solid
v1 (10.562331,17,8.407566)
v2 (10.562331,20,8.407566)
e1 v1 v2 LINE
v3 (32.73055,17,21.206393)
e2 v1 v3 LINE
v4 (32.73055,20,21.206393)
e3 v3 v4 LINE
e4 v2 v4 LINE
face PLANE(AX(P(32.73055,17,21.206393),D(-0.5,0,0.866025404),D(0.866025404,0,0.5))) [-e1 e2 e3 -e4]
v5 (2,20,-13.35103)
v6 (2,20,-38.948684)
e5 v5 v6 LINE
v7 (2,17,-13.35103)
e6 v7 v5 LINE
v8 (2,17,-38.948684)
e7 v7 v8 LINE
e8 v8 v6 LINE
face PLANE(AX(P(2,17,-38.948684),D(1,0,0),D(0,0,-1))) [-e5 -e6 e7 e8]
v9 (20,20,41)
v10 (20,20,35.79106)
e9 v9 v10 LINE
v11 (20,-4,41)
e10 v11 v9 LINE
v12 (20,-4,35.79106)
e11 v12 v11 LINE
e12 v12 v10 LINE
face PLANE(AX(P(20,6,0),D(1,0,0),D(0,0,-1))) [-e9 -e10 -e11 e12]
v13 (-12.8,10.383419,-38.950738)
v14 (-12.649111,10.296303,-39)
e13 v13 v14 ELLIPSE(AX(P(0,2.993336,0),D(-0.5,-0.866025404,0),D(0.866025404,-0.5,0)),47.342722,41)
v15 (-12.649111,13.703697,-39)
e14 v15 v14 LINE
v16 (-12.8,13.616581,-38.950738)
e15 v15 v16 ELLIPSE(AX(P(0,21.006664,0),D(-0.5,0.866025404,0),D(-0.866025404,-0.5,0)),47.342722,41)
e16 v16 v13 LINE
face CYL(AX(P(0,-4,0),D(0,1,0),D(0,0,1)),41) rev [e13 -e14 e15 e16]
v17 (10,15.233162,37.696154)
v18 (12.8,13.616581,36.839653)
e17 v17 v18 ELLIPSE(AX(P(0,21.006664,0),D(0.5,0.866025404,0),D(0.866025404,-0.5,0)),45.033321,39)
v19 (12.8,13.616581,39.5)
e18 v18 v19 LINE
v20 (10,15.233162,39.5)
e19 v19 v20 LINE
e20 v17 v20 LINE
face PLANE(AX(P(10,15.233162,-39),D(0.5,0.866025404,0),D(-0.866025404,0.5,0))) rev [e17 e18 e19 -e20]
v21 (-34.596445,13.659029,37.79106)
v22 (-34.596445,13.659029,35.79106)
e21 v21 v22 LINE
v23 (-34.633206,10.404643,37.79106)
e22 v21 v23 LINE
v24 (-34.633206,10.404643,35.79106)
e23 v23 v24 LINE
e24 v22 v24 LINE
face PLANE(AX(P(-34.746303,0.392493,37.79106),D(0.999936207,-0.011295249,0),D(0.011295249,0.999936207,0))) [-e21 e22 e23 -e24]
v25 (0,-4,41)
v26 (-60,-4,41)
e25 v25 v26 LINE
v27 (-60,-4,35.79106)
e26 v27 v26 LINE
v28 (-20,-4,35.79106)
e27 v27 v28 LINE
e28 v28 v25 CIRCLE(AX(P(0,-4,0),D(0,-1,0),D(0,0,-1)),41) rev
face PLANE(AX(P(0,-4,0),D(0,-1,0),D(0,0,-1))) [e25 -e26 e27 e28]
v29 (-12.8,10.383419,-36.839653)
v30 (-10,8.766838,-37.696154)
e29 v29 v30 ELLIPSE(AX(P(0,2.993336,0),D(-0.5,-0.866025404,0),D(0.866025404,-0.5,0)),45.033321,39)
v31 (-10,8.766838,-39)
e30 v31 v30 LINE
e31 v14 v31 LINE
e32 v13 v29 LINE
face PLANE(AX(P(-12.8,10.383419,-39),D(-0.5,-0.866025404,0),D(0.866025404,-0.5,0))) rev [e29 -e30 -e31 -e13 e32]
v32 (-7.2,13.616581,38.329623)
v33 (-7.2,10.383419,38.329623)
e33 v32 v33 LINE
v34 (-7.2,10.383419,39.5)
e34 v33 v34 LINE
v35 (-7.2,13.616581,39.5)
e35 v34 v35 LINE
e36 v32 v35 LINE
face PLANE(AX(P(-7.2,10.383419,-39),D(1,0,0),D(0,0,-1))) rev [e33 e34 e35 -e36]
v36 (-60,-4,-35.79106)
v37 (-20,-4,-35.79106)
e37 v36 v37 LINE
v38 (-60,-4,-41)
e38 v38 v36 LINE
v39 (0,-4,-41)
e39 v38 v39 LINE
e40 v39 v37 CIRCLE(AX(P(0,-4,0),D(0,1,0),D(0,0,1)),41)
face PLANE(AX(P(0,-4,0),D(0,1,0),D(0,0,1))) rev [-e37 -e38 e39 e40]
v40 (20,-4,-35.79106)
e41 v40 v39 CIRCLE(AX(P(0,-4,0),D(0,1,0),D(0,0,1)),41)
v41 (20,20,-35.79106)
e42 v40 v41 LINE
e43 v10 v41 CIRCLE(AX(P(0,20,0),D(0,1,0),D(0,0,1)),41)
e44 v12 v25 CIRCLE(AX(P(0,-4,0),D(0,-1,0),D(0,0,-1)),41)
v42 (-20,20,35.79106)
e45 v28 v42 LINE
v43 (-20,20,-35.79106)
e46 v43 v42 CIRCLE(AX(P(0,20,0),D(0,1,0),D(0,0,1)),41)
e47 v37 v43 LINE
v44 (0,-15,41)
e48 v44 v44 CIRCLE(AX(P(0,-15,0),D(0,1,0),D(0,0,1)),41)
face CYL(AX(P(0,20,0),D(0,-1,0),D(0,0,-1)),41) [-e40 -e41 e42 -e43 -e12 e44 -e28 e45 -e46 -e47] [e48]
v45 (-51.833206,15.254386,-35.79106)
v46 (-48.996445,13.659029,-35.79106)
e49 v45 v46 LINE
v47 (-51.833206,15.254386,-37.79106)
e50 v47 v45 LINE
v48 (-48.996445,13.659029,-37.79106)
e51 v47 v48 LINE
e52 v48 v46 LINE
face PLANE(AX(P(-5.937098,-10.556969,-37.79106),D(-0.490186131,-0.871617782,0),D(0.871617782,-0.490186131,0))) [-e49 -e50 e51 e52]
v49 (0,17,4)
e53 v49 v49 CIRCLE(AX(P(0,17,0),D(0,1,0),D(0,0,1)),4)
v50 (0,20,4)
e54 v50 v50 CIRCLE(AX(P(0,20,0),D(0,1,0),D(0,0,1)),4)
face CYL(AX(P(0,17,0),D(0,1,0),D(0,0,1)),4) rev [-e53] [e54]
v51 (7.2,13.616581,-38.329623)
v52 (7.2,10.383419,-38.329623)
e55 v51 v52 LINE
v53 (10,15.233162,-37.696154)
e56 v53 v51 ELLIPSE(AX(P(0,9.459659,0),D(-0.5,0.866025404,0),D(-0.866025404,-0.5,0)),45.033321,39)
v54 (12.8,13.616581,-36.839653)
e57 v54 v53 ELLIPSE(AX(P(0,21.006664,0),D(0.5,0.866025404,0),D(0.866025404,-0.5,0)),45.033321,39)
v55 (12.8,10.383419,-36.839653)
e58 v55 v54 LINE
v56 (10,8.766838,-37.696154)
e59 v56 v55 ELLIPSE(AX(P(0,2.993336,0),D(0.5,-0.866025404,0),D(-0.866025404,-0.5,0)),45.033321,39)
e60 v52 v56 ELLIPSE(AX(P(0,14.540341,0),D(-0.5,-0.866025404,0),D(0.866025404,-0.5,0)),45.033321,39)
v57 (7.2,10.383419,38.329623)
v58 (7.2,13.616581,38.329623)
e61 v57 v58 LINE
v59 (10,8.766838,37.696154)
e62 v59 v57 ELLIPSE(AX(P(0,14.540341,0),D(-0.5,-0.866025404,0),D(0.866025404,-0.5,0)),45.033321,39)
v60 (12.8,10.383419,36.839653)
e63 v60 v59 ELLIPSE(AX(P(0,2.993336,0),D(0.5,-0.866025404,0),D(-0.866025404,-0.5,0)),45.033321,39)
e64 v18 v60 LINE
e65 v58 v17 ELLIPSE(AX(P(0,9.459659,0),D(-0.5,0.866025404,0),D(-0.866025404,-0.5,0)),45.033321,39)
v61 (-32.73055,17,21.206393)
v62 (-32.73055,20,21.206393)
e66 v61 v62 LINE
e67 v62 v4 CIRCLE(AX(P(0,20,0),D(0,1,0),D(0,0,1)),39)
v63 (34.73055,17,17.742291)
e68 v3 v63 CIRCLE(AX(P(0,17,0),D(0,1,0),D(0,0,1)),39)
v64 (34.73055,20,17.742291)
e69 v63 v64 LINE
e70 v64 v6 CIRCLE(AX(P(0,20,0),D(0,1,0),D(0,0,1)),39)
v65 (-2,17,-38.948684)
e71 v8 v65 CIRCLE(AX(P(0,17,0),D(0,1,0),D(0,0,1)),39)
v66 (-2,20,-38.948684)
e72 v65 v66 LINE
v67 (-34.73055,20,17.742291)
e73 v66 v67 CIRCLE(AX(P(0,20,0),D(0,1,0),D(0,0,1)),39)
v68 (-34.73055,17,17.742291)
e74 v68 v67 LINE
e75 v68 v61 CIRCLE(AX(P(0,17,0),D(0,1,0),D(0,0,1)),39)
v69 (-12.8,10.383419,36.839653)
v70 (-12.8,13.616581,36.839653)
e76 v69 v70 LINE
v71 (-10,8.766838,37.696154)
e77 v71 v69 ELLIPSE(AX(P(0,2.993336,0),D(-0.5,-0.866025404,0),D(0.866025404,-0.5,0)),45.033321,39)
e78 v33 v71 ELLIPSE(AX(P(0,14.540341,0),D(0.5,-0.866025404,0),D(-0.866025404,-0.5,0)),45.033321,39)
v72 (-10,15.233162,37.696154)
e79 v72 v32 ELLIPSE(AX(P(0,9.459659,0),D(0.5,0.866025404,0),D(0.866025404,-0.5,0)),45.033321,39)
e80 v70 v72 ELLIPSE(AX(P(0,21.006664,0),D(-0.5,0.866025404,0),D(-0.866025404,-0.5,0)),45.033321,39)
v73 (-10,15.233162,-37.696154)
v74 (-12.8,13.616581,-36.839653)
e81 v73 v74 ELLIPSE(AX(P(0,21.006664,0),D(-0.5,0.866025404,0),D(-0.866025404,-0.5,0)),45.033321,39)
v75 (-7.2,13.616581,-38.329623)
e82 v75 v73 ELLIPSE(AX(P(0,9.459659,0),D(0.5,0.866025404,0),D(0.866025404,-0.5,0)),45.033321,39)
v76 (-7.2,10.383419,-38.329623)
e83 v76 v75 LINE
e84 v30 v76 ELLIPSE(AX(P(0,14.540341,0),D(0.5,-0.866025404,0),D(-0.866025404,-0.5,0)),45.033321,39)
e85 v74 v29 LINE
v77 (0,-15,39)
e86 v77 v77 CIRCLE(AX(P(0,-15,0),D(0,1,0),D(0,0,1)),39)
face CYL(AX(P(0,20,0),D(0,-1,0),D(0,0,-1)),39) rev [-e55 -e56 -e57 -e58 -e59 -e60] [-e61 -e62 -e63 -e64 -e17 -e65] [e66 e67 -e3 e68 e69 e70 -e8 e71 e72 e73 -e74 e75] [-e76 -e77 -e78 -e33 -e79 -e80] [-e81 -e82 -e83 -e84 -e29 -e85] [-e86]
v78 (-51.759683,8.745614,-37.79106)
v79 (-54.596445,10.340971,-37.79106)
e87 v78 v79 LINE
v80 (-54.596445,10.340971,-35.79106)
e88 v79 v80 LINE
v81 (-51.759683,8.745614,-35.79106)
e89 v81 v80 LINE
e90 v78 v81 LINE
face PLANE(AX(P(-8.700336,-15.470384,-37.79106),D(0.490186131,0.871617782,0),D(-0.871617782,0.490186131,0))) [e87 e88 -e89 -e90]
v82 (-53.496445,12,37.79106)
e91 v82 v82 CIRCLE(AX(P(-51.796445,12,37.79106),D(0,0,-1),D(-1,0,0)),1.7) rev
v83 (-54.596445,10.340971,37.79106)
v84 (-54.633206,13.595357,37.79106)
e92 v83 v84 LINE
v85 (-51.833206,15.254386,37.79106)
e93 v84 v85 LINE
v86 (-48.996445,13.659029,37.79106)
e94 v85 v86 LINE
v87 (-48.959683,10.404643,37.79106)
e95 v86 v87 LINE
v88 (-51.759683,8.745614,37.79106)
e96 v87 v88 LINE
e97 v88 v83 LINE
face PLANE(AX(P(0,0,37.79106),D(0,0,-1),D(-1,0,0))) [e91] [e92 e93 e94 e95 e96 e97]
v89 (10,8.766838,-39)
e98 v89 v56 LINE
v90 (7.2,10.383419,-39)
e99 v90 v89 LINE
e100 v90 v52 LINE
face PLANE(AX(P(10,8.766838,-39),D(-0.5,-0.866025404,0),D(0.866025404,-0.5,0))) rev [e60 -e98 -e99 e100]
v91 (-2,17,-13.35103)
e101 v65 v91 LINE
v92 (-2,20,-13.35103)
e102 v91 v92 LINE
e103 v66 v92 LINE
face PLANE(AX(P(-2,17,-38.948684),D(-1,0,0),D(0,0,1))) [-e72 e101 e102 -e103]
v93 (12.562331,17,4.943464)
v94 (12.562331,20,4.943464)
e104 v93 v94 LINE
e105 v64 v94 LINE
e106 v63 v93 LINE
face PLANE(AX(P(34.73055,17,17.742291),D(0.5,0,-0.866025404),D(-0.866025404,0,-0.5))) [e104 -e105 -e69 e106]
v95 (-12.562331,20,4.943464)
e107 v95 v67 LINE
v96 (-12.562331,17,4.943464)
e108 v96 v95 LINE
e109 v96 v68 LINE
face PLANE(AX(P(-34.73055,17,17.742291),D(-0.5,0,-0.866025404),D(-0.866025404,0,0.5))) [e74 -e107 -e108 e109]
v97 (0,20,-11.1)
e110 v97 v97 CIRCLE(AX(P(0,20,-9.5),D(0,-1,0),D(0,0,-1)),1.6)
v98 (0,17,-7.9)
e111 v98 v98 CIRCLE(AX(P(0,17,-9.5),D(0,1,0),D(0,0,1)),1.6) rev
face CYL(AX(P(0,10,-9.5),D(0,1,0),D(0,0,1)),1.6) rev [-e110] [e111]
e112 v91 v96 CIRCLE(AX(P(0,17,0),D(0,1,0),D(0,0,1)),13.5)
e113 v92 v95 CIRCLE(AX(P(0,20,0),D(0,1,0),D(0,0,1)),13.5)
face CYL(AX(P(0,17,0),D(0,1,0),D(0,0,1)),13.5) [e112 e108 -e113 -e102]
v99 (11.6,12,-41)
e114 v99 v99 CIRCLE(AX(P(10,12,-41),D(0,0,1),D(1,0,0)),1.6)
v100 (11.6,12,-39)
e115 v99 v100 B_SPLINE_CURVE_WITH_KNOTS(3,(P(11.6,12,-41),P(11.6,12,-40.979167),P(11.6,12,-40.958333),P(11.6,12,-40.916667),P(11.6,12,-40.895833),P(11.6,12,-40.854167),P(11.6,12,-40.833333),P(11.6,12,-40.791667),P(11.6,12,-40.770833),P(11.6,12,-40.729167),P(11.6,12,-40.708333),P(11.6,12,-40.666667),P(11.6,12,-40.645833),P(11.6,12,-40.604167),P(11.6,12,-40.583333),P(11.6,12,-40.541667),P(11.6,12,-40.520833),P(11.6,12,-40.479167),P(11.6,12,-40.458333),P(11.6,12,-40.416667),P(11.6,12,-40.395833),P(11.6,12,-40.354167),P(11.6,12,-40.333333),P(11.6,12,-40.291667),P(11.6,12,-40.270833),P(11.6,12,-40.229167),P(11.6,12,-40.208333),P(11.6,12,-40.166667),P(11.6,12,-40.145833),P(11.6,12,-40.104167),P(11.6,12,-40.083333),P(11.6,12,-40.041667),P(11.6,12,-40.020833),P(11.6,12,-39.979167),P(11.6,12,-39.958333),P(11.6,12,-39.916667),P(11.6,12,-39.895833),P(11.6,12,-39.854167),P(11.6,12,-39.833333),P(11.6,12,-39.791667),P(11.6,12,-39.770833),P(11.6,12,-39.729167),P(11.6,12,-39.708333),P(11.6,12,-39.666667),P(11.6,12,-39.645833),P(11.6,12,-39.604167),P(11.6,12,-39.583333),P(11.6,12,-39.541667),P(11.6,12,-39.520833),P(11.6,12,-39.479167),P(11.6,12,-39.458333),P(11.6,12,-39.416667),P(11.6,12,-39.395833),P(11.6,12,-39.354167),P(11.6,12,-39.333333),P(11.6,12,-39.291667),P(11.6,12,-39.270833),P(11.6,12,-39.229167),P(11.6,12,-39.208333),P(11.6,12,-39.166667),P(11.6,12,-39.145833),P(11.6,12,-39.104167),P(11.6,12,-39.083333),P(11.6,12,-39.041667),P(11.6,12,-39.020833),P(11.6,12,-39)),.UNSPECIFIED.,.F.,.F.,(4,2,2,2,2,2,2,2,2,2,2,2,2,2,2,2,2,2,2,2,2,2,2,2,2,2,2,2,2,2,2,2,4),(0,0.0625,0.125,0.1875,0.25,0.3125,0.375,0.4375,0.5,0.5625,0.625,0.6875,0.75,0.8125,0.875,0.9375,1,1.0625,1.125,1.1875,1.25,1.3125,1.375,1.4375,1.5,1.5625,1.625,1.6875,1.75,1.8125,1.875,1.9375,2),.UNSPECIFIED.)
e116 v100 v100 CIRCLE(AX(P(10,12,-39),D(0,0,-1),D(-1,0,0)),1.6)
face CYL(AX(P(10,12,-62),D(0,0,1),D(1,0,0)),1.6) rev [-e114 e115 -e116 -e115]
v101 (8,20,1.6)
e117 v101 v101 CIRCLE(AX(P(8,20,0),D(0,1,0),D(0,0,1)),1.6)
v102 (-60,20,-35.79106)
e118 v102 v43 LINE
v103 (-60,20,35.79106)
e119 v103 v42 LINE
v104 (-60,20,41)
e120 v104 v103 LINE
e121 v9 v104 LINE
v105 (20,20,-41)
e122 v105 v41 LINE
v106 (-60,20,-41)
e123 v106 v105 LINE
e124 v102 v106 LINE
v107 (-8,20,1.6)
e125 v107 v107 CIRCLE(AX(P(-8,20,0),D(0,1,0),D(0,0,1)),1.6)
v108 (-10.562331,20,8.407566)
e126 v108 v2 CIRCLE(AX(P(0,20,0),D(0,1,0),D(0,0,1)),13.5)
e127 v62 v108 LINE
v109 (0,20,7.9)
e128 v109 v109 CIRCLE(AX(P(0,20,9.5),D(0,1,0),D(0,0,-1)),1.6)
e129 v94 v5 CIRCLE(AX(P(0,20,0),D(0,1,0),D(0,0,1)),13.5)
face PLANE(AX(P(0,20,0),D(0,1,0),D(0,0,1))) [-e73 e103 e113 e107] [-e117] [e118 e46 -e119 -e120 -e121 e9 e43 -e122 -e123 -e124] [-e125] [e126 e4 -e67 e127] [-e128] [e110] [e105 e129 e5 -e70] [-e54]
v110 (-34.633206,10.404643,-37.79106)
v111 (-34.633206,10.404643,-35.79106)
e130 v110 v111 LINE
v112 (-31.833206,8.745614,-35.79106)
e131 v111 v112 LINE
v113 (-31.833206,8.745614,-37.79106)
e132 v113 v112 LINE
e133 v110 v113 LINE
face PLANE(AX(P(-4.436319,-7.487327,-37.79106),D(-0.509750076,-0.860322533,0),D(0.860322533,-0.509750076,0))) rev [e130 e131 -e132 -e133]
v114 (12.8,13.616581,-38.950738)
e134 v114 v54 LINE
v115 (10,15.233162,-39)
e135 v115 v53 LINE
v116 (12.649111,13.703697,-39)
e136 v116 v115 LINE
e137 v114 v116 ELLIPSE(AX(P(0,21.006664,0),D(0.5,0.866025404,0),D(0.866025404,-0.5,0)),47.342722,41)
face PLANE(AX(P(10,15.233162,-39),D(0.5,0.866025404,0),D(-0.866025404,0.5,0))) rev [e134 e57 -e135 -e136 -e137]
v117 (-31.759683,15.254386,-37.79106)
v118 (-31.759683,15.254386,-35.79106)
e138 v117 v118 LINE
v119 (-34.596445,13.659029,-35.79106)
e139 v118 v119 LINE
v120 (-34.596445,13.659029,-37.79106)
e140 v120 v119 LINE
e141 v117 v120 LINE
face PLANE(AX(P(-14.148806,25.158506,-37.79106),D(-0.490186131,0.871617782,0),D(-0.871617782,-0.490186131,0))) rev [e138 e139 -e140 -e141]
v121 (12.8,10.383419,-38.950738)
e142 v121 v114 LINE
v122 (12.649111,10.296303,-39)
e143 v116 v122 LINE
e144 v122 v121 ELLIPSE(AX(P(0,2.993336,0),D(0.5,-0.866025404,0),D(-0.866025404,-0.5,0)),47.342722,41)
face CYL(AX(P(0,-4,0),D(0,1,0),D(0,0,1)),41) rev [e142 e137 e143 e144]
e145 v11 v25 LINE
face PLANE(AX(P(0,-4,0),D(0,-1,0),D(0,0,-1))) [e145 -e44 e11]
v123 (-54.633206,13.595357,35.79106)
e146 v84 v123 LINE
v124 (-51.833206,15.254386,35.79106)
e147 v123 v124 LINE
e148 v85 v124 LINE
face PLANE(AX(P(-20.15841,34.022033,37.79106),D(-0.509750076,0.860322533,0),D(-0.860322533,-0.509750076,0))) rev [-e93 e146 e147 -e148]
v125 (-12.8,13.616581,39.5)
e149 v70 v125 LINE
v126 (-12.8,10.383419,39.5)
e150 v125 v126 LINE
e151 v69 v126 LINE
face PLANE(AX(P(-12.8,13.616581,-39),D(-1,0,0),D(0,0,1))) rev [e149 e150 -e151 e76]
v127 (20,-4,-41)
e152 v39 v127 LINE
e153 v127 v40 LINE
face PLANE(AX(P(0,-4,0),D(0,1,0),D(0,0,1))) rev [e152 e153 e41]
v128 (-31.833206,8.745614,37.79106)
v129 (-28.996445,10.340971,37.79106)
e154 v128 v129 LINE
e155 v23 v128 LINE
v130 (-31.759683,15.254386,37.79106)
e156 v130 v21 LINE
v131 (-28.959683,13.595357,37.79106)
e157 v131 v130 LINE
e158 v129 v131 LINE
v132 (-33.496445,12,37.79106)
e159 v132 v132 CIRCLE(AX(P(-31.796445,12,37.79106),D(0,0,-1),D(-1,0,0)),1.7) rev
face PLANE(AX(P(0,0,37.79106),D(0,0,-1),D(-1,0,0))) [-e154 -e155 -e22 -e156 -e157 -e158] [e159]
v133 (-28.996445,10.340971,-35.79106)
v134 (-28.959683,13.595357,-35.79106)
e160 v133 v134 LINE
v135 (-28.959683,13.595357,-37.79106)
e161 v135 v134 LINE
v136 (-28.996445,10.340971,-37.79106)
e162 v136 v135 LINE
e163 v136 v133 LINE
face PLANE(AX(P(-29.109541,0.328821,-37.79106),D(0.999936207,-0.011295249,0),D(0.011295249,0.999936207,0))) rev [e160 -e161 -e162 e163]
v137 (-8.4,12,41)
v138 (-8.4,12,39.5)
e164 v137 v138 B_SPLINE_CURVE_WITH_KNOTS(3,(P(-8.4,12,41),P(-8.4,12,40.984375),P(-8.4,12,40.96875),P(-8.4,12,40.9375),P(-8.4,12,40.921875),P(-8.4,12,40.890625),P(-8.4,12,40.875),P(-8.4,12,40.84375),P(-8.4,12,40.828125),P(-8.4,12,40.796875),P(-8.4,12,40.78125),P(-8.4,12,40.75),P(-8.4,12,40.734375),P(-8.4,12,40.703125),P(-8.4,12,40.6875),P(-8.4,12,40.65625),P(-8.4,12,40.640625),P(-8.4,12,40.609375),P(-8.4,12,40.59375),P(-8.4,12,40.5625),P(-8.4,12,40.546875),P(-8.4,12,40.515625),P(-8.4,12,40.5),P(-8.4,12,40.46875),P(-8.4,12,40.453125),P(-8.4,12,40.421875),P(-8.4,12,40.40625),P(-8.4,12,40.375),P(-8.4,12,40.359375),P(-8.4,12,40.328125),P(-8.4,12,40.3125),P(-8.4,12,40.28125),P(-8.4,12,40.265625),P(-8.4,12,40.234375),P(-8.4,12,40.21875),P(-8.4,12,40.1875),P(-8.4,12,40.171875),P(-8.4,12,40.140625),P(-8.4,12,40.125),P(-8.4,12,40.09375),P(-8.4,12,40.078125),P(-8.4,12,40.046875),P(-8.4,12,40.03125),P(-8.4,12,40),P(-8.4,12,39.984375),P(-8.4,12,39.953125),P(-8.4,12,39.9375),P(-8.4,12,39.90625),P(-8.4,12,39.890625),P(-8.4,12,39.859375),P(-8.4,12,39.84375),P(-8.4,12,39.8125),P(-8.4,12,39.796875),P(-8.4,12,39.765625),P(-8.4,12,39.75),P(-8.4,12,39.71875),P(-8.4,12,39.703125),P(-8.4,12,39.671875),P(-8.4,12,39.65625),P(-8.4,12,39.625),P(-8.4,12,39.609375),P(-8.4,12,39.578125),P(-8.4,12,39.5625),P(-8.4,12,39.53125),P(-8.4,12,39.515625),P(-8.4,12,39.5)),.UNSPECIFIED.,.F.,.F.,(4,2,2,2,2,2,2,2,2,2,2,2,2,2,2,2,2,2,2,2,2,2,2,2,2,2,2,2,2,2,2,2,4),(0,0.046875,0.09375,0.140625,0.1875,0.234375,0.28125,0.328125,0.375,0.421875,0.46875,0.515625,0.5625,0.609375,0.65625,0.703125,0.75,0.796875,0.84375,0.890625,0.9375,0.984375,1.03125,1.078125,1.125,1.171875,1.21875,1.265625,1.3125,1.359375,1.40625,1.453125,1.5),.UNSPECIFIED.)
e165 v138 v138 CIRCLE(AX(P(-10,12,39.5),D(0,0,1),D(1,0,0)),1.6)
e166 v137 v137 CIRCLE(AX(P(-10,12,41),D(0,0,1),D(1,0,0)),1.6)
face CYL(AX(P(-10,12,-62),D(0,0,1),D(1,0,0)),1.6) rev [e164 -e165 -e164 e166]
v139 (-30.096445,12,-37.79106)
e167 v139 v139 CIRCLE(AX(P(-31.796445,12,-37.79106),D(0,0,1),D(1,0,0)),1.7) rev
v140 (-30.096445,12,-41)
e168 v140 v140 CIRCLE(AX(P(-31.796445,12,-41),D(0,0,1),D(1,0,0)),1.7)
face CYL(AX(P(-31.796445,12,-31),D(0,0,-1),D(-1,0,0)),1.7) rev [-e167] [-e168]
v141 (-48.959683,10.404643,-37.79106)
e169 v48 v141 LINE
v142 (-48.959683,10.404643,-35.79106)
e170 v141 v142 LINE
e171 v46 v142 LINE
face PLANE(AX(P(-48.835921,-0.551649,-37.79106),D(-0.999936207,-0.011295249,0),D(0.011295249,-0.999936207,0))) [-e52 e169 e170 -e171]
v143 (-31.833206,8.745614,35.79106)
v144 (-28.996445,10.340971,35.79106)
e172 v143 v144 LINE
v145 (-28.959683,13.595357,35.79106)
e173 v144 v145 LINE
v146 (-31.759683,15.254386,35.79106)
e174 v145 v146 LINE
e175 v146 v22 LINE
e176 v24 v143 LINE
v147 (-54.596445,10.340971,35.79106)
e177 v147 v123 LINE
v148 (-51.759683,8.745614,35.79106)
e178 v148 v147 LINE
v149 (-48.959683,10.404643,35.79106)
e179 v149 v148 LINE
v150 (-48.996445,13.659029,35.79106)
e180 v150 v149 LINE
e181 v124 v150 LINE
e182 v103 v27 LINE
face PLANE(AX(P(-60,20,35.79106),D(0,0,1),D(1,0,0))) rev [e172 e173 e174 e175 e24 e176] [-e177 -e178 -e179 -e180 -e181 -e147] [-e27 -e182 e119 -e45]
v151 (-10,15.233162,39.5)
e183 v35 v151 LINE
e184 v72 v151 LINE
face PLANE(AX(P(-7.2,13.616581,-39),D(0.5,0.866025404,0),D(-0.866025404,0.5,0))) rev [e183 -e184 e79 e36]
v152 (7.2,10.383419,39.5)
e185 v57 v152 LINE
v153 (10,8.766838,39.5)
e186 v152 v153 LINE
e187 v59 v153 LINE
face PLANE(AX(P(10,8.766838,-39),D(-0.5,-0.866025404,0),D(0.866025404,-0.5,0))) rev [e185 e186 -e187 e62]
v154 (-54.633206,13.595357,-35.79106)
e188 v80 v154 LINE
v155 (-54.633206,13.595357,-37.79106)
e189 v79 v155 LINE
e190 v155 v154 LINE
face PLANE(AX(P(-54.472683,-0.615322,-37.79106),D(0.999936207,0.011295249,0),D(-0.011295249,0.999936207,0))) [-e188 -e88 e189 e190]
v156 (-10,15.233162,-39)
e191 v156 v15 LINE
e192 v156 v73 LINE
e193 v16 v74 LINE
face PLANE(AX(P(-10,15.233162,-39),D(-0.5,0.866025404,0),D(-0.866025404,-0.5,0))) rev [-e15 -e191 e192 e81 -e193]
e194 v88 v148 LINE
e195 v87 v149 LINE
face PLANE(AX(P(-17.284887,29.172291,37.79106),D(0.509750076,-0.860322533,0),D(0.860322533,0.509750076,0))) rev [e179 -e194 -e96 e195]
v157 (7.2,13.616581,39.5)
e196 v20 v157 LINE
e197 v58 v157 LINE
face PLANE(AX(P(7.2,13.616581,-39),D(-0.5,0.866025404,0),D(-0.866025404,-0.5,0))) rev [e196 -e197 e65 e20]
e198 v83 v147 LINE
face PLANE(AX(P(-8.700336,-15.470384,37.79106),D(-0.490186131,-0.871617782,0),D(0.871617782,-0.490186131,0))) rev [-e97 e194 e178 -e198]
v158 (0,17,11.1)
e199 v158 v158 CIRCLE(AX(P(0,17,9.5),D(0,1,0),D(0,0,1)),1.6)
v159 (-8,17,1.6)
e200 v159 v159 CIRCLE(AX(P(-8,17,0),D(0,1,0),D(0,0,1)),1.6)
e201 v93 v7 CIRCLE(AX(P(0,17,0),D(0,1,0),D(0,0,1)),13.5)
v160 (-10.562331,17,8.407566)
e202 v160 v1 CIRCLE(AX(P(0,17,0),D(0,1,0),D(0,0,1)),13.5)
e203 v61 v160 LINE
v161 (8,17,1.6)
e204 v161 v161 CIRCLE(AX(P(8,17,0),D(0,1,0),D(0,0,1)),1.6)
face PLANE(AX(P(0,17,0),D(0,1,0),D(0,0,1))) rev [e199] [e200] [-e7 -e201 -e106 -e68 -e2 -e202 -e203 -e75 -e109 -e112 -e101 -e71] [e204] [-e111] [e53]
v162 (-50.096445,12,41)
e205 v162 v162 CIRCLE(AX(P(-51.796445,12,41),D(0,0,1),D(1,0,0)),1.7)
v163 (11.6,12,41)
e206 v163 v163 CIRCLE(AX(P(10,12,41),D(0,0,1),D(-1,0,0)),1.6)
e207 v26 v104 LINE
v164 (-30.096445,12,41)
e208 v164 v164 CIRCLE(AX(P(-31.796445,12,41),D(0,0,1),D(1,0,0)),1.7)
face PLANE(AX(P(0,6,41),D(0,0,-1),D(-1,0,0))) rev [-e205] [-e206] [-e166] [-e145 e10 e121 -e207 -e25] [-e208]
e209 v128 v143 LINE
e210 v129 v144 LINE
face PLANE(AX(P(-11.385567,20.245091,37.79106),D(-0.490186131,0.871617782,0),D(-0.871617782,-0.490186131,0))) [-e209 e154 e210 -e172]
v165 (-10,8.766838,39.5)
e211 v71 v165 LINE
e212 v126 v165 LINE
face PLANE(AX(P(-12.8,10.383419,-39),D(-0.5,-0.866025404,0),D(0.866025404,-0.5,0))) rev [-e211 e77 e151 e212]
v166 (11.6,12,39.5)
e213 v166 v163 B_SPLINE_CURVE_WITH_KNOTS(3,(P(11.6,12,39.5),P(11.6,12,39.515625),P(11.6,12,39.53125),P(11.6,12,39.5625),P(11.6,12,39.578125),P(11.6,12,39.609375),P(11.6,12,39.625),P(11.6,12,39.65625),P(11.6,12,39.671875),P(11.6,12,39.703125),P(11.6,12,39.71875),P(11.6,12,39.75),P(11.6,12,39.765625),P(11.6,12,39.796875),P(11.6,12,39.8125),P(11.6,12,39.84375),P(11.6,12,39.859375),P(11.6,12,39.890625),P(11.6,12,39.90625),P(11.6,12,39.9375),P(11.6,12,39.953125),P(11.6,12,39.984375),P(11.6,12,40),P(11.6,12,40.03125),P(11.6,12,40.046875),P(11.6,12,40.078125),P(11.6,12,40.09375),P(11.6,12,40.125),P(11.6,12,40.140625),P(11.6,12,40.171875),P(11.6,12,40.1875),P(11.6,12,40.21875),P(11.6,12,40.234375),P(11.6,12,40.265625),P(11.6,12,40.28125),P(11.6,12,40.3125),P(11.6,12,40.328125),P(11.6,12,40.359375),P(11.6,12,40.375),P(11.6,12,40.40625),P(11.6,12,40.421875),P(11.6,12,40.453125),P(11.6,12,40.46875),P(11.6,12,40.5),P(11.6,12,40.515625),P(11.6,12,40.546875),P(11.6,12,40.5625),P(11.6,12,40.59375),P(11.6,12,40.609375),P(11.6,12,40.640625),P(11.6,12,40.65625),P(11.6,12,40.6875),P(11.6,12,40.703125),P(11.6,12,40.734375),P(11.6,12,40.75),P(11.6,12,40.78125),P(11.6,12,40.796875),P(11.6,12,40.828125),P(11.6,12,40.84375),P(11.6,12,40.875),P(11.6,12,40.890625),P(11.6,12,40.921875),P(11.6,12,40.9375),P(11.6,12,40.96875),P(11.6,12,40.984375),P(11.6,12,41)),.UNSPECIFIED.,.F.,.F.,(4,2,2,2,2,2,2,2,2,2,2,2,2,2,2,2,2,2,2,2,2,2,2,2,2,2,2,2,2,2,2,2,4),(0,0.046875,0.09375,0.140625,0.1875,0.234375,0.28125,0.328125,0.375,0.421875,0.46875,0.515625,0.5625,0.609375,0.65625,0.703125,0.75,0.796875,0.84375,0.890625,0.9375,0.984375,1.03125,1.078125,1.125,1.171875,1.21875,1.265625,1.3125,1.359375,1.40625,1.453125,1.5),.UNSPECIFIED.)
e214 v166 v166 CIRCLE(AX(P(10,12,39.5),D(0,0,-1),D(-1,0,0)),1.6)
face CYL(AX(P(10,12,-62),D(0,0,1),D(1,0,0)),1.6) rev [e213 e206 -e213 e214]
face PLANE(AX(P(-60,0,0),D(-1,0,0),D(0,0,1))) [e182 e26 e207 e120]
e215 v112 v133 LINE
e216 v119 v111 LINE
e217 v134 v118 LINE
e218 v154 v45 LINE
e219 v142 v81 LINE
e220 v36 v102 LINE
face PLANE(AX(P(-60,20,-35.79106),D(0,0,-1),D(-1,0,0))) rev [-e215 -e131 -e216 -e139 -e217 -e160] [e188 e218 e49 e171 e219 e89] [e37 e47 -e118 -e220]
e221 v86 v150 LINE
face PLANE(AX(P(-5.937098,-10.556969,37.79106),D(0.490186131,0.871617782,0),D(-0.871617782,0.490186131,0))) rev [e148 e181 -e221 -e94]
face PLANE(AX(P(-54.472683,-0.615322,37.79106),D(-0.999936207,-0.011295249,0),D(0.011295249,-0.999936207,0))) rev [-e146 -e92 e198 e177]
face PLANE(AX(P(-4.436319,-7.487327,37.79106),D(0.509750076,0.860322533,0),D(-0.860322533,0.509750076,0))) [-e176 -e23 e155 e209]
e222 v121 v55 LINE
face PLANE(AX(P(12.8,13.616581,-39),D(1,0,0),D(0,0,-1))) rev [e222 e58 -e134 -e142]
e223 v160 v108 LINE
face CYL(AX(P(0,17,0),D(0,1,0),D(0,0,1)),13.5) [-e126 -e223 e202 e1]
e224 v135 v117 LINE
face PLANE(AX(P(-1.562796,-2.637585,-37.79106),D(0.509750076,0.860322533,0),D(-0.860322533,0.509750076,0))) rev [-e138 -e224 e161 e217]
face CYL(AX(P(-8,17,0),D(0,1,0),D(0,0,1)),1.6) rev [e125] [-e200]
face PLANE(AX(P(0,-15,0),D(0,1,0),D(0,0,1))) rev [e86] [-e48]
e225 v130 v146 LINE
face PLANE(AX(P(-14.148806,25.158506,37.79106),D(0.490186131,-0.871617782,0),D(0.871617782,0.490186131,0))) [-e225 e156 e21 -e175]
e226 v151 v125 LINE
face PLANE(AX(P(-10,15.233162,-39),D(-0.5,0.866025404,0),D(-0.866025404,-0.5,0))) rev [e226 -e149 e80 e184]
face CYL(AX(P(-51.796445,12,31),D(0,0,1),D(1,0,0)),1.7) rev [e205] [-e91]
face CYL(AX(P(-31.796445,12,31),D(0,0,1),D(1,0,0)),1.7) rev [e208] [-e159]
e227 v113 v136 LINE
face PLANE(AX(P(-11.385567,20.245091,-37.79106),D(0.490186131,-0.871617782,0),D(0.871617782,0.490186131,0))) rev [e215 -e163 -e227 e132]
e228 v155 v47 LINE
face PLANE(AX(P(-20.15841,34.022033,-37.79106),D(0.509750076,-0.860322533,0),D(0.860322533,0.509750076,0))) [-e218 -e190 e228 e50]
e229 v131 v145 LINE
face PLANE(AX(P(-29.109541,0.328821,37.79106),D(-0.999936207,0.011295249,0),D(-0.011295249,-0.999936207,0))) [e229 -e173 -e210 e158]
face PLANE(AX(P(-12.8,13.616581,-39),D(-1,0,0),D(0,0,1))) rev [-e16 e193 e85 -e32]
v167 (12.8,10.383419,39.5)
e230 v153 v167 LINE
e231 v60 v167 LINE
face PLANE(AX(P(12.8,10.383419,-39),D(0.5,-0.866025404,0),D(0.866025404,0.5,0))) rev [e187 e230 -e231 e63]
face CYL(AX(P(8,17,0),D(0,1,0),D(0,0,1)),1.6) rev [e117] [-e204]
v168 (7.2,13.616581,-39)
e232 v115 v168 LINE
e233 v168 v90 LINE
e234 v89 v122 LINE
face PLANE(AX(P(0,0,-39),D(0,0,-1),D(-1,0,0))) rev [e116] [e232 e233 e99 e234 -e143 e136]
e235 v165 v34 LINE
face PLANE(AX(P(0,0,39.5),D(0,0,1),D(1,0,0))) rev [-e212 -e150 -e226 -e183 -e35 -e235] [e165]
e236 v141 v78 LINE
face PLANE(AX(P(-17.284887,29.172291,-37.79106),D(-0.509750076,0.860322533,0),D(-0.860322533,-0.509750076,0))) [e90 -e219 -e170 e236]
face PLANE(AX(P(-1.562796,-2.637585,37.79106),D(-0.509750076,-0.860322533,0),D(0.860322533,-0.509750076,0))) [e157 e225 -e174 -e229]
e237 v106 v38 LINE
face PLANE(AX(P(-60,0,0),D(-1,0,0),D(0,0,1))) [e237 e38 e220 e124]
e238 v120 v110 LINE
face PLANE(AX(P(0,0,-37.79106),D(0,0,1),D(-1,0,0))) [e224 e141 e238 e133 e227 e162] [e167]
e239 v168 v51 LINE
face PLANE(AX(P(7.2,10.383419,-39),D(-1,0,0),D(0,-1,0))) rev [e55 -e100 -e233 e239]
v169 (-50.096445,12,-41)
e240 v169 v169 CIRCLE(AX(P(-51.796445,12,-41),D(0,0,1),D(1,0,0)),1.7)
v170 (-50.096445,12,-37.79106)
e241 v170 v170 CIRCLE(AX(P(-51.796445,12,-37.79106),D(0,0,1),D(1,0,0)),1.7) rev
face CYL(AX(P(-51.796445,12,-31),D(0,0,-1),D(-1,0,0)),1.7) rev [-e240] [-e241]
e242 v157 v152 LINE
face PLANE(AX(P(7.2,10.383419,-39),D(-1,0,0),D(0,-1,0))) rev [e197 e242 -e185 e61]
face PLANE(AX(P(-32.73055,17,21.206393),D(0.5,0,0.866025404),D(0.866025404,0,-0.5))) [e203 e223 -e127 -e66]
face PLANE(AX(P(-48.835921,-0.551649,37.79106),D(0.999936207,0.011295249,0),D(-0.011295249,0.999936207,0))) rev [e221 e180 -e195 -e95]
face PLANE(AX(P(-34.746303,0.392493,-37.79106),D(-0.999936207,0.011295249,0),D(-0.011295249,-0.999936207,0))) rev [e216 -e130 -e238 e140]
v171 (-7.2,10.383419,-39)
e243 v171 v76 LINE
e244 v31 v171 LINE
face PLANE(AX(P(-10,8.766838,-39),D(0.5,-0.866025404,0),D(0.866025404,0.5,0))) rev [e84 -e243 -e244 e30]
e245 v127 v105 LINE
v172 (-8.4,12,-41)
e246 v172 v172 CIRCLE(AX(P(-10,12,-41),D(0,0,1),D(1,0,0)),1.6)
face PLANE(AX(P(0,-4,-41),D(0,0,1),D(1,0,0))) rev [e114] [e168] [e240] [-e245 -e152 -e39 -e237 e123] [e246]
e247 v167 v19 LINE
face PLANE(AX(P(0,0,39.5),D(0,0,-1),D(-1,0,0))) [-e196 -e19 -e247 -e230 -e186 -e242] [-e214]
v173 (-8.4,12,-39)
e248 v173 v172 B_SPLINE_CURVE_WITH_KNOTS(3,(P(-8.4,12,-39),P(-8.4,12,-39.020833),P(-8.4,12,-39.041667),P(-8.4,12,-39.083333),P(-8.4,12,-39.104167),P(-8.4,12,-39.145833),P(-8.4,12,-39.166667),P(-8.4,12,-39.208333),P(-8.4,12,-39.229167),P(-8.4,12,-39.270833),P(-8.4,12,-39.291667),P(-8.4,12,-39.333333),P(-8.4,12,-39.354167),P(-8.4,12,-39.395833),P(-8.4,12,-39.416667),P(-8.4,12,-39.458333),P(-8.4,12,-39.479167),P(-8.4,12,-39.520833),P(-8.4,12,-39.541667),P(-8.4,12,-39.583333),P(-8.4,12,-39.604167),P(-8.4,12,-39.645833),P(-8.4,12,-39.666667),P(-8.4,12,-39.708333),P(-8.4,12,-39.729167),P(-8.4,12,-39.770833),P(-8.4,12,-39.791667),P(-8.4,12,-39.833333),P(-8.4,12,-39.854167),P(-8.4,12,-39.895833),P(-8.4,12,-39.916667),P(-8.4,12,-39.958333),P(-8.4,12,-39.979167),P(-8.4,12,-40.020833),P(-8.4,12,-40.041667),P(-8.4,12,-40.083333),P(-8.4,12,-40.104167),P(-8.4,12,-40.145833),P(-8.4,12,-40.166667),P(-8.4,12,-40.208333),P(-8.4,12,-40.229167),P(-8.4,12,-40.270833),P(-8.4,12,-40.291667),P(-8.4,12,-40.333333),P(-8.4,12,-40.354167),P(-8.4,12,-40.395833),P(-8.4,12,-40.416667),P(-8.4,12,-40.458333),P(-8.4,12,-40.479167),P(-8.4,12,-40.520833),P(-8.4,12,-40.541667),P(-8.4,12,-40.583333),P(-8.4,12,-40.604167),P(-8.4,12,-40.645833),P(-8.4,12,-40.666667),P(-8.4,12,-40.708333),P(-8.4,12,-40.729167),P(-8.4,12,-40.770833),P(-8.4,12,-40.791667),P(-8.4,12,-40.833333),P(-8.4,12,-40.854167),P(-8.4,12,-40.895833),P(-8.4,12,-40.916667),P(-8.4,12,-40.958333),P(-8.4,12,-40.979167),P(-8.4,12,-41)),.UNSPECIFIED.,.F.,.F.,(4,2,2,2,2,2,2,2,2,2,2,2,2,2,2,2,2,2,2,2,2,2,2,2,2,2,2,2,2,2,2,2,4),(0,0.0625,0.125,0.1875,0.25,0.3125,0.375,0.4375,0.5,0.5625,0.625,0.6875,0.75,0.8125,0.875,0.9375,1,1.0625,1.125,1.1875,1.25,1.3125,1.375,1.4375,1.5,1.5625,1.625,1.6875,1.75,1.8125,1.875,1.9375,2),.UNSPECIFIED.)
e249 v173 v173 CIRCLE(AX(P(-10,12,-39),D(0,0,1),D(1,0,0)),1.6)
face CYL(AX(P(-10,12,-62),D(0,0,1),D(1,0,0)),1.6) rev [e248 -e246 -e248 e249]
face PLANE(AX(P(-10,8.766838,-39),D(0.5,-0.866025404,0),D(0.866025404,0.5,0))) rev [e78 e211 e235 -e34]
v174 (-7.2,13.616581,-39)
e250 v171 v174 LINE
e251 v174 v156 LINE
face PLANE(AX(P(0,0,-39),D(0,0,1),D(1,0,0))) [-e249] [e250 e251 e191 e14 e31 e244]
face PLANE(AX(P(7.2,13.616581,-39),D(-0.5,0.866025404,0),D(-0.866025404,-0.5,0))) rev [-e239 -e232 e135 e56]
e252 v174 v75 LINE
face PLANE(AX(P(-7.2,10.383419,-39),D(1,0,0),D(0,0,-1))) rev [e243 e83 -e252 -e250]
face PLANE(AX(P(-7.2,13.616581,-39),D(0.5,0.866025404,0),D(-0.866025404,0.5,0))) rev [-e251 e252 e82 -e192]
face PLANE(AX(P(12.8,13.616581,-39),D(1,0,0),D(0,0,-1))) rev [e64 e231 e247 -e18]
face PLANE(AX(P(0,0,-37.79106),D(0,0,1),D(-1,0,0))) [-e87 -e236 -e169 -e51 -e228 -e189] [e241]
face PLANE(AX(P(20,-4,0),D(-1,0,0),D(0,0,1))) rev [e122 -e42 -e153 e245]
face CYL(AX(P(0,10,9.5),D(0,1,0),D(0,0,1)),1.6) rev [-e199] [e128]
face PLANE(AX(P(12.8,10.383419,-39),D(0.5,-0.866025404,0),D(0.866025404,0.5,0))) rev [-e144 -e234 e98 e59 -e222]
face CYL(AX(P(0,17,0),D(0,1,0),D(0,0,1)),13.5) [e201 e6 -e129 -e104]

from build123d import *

# Parameters (mm, degrees)
SKETCH_1_R           = 41
SKETCH_1_R_2         = 39
EXTRUDE_1_DEPTH      = 20
EXTRUDE_START        = -14
EXTRUDE_2_DEPTH      = 14
EXTRUDE_START_2      = -3
SKETCH_3_R           = 4
SKETCH_3_R_2         = 1.6
EXTRUDE_3_DEPTH      = 3
CUT_EXTRUDE_3_DEPTH  = 3
EXTRUDE_5_DEPTH      = 10
EXTRUDE_5_DEPTH_BACK = 15
SKETCH_1_2_R         = 41
SKETCH_1_2_R_2       = 39
EXTRUDE_START_3      = 10
EXTRUDE_7_DEPTH      = 10
EXTRUDE_8_DEPTH      = 10
EXTRUDE_8_DEPTH_BACK = 5
CUT_EXTRUDE_4_DEPTH  = 80
EXTRUDE_START_4      = -24
EXTRUDE_10_DEPTH     = 24
EXTRUDE_9_DEPTH      = 10
EXTRUDE_9_DEPTH_BACK = 1.5
CUT_EXTRUDE_6_DEPTH  = 10
SKETCH_16_R          = 1.6
CUT_EXTRUDE_7_DEPTH  = 103
SKETCH_18_R          = 1.6
CUT_EXTRUDE_8_DEPTH  = 10
SKETCH_18_4_R        = 1.6
CUT_EXTRUDE_9_DEPTH  = 10
SKETCH_21_W          = 5.208939664
SKETCH_21_H          = 24
EXTRUDE_11_DEPTH     = 40
SKETCH_22_W          = 5.208939664
SKETCH_22_H          = 24
EXTRUDE_12_DEPTH     = 40
SKETCH_23_R          = 1.7
CUT_EXTRUDE_10_DEPTH = 10
CUT_EXTRUDE_START    = -2
SKETCH_24_R          = 1.7
CUT_EXTRUDE_11_DEPTH = 2


# Read off the part's stored shape, not the designer's step: the extrude step
with BuildPart() as part:
    # 草图1 → 凸台-拉伸1 (new body)
    with BuildSketch(Plane(origin=(0, 0, 0), x_dir=(1, 0, 0), z_dir=(0, 1, 0))):
        with Locations(Location((0, 0, 0), (0, 0, 270))):
            Circle(SKETCH_1_R)
        with Locations(Location((0, 0, 0), (0, 0, 270))):
            Circle(SKETCH_1_R_2, mode=Mode.SUBTRACT)
    extrude(amount=EXTRUDE_1_DEPTH)

    # 草图2 → 凸台-拉伸2 (add)
    with BuildSketch(Plane(origin=(0, 20, 0), x_dir=(1, 0, 0), z_dir=(0, 1, 0)).offset(EXTRUDE_START)):
        with BuildLine():
            Line((-20, -41), (3.5e-08, -41))
            ThreePointArc((3.5e-08, -41), (-10.333598732, -39.676400256), (-20, -35.791060336))
            Line((-20, -35.791060336), (-20, -41))
        make_face()
        with BuildLine():
            Line((3.5e-08, -41), (20, -41))
            Line((20, -41), (20, -35.791060336))
            ThreePointArc((20, -35.791060336), (10.333598766, -39.676400247), (3.5e-08, -41))
        make_face()
    extrude(amount=EXTRUDE_2_DEPTH)

    # 草图3 → 凸台-拉伸3 (add)
    with BuildSketch(Plane(origin=(0, 20, 0), x_dir=(1, 0, 0), z_dir=(0, 1, 0)).offset(EXTRUDE_START_2)):
        with BuildLine():
            Line((-2, 38.948684188), (-2, 13.351029923))
            ThreePointArc((-2, 13.351029923), (-11.691342951, 6.75), (-12.56233108, -4.943464154))
            Line((-12.56233108, -4.943464154), (-34.730549951, -17.742291287))
            ThreePointArc((-34.730549951, -17.742291287), (-33.774990748, -19.5), (-32.730549951, -21.206392902))
            Line((-32.730549951, -21.206392902), (-10.56233108, -8.407565769))
            ThreePointArc((-10.56233108, -8.407565769), (0, -13.5), (10.56233108, -8.407565769))
            Line((10.56233108, -8.407565769), (32.730549951, -21.206392902))
            ThreePointArc((32.730549951, -21.206392902), (33.774990748, -19.5), (34.730549951, -17.742291287))
            Line((34.730549951, -17.742291287), (12.56233108, -4.943464154))
            ThreePointArc((12.56233108, -4.943464154), (11.691342951, 6.75), (2, 13.351029923))
            Line((2, 13.351029923), (2, 38.948684188))
            ThreePointArc((2, 38.948684188), (0, 39), (-2, 38.948684188))
        make_face()
        with Locations(Location((0, 0, 0), (0, 0, 270))):
            Circle(SKETCH_3_R, mode=Mode.SUBTRACT)
        with Locations(Location((-8, 0, 0), (0, 0, 270))):
            Circle(SKETCH_3_R_2, mode=Mode.SUBTRACT)
        with Locations(Location((8, 0, 0), (0, 0, 270))):
            Circle(SKETCH_3_R_2, mode=Mode.SUBTRACT)
    extrude(amount=EXTRUDE_3_DEPTH)

    # 草图7 → 切除-拉伸3 (cut)
    with BuildSketch(Plane.XZ.offset(-6)):
        with BuildLine():
            Line((0, 41), (-20, 41))
            Line((-20, 41), (-20, 35.791060336))
            ThreePointArc((-20, 35.791060336), (-10.333598749, 39.676400251), (0, 41))
        make_face()
        with BuildLine():
            Line((20, 41), (0, 41))
            ThreePointArc((0, 41), (10.333598749, 39.676400251), (20, 35.791060336))
            Line((20, 35.791060336), (20, 41))
        make_face()
    extrude(amount=-CUT_EXTRUDE_3_DEPTH, mode=Mode.SUBTRACT)

    # 草图1<2> → 凸台-拉伸5 (add, two sides: drawn at the far end of the back side and taken through both)
    with BuildSketch(Plane(origin=(0, 0, 0), x_dir=(1, 0, 0), z_dir=(0, 1, 0)).offset(-EXTRUDE_5_DEPTH_BACK)):
        with Locations(Location((0, 0, 0), (0, 0, 270))):
            Circle(SKETCH_1_2_R)
        with Locations(Location((0, 0, 0), (0, 0, 92.939534486))):
            Circle(SKETCH_1_2_R_2, mode=Mode.SUBTRACT)
    extrude(amount=EXTRUDE_5_DEPTH + EXTRUDE_5_DEPTH_BACK)

    # 草图7<4> → 凸台-拉伸7 (add)
    with BuildSketch(Plane.XZ.offset(-6).offset(EXTRUDE_START_3)):
        with BuildLine():
            Line((0, 41), (-20, 41))
            Line((-20, 41), (-20, 35.791060336))
            ThreePointArc((-20, 35.791060336), (-10.333598749, 39.676400251), (0, 41))
        make_face()
        with BuildLine():
            Line((20, 41), (0, 41))
            ThreePointArc((0, 41), (10.333598749, 39.676400251), (20, 35.791060336))
            Line((20, 35.791060336), (20, 41))
        make_face()
    extrude(amount=-EXTRUDE_7_DEPTH)

    # 草图7<5> → 凸台-拉伸8 (add, two sides: drawn at the far end of the back side and taken through both)
    with BuildSketch(Plane.XZ.offset(-6).offset(-EXTRUDE_8_DEPTH_BACK)):
        with BuildLine():
            Line((0, 41), (-20, 41))
            Line((-20, 41), (-20, 35.791060336))
            ThreePointArc((-20, 35.791060336), (-10.333598749, 39.676400251), (0, 41))
        make_face()
        with BuildLine():
            Line((20, 41), (0, 41))
            ThreePointArc((0, 41), (10.333598749, 39.676400251), (20, 35.791060336))
            Line((20, 35.791060336), (20, 41))
        make_face()
    extrude(amount=EXTRUDE_8_DEPTH + EXTRUDE_8_DEPTH_BACK)

    # 草图4 → 切除-拉伸4 (cut)
    with BuildSketch(Plane.XY.offset(41)):
        Polygon((-10, 8.766838493), (-7.2, 10.383419246), (-7.2, 13.616580754), (-10, 15.233161507), (-12.8, 13.616580754), (-12.8, 10.383419246), align=None)
        Polygon((12.8, 10.383419246), (10, 8.766838493), (7.2, 10.383419246), (7.2, 13.616580754), (10, 15.233161507), (12.8, 13.616580754), align=None)
    extrude(amount=-CUT_EXTRUDE_4_DEPTH, mode=Mode.SUBTRACT)

    # 凸台-拉伸10 outline → 凸台-拉伸10 (add)
    with BuildSketch(Plane(origin=(0, 20, 0), x_dir=(1, 0, 0), z_dir=(0, 1, 0)).offset(EXTRUDE_START_4)):
        with BuildLine():
            Line((20, 35.791060336), (20, 41))
            Line((20, 41), (8e-08, 41))
            ThreePointArc((8e-08, 41), (6.403124277, 40.496913456), (12.649110641, 39))
            ThreePointArc((12.649110641, 39), (12.72457916, 38.975442079), (12.8, 38.950738119))
            ThreePointArc((12.8, 38.950738119), (16.475918515, 37.543895763), (20, 35.791060336))
        make_face()
        with BuildLine():
            ThreePointArc((-12.649110641, 39), (-6.403124198, 40.496913469), (8e-08, 41))
            Line((8e-08, 41), (-20, 41))
            Line((-20, 41), (-20, 35.791060336))
            ThreePointArc((-20, 35.791060336), (-16.475918515, 37.543895763), (-12.8, 38.950738119))
            ThreePointArc((-12.8, 38.950738119), (-12.72457916, 38.975442079), (-12.649110641, 39))
        make_face()
    extrude(amount=EXTRUDE_10_DEPTH)

    # 草图4<3> → 凸台-拉伸9 (add, two sides: drawn at the far end of the back side and taken through both)
    with BuildSketch(Plane.XY.offset(41).offset(-EXTRUDE_9_DEPTH_BACK)):
        Polygon((-10, 8.766838493), (-7.2, 10.383419246), (-7.2, 13.616580754), (-10, 15.233161507), (-12.8, 13.616580754), (-12.8, 10.383419246), align=None)
        Polygon((12.8, 10.383419246), (10, 8.766838493), (7.2, 10.383419246), (7.2, 13.616580754), (10, 15.233161507), (12.8, 13.616580754), align=None)
    extrude(amount=EXTRUDE_9_DEPTH + EXTRUDE_9_DEPTH_BACK)

    # 草图13 → 切除-拉伸6 (cut)
    with BuildSketch(Plane.XY.offset(51)):
        Polygon((10, 15.233161507), (7.2, 13.616580754), (7.2, 10.383419246), (10, 8.766838493), (12.8, 10.383419246), (12.8, 13.616580754), align=None)
        Polygon((-10, 15.233161507), (-12.8, 13.616580754), (-12.8, 10.383419246), (-10, 8.766838493), (-7.2, 10.383419246), (-7.2, 13.616580754), align=None)
    extrude(amount=-CUT_EXTRUDE_6_DEPTH, mode=Mode.SUBTRACT)

    # 草图16 → 切除-拉伸7 (cut)
    with BuildSketch(Plane.XY.offset(41)):
        with Locations((-10, 12)):
            Circle(SKETCH_16_R)
        with Locations((10, 12)):
            Circle(SKETCH_16_R)
    extrude(amount=-CUT_EXTRUDE_7_DEPTH, mode=Mode.SUBTRACT)

    # 草图18 → 切除-拉伸8 (cut)
    with BuildSketch(Plane(origin=(0, 20, 0), x_dir=(1, 0, 0), z_dir=(0, 1, 0))):
        with Locations(Location((0, 9.5, 0), (0, 0, 270))):
            Circle(SKETCH_18_R)
    extrude(amount=-CUT_EXTRUDE_8_DEPTH, mode=Mode.SUBTRACT)

    # 草图18<4> → 切除-拉伸9 (cut)
    with BuildSketch(Plane(origin=(0, 20, 0), x_dir=(1, 0, 0), z_dir=(0, 1, 0))):
        with Locations(Location((0, 9.5, 0), (0, 0, 270))):
            Circle(SKETCH_18_4_R)
        with Locations(Location((0, -9.5, 0), (0, 0, 270))):
            Circle(SKETCH_18_4_R)
    extrude(amount=-CUT_EXTRUDE_9_DEPTH, mode=Mode.SUBTRACT)

    # 草图21 → 凸台-拉伸11 (add)
    with BuildSketch(Plane.ZY.offset(20)):
        with Locations((38.395530168, 8)):
            Rectangle(SKETCH_21_W, SKETCH_21_H)
    extrude(amount=EXTRUDE_11_DEPTH)

    # 草图22 → 凸台-拉伸12 (add)
    with BuildSketch(Plane.ZY.offset(20)):
        with Locations((-38.395530168, 8)):
            Rectangle(SKETCH_22_W, SKETCH_22_H)
    extrude(amount=EXTRUDE_12_DEPTH)

    # 草图23 → 切除-拉伸10 (cut)
    with BuildSketch(Plane.XY.offset(41)):
        with Locations((-51.796444508, 12)):
            Circle(SKETCH_23_R)
        with Locations((-31.796444508, 12)):
            Circle(SKETCH_23_R)
    cut_extrude_10 = extrude(amount=-CUT_EXTRUDE_10_DEPTH, mode=Mode.SUBTRACT)

    # 草图24 → 切除-拉伸11 (cut)
    # profile 1 of 2: a face of its own
    with BuildSketch(Plane(origin=(0, 0, 35.791060336), x_dir=(-1, 0, 0), z_dir=(0, 0, -1)).offset(CUT_EXTRUDE_START)):
        Polygon((28.996444508, 10.340970788), (31.833205951, 8.745614264), (34.633205951, 10.404643475), (34.596444508, 13.659029212), (31.759683065, 15.254385736), (28.959683065, 13.595356525), align=None)
        with Locations(Location((31.796444508, 12, 0), (0, 0, 180))):
            Circle(SKETCH_24_R, mode=Mode.SUBTRACT)
    # profile 2 of 2: a face of its own
    with BuildSketch(Plane(origin=(0, 0, 35.791060336), x_dir=(-1, 0, 0), z_dir=(0, 0, -1)).offset(CUT_EXTRUDE_START)):
        Polygon((51.759683065, 8.745614264), (54.596444508, 10.340970788), (54.633205951, 13.595356525), (51.833205951, 15.254385736), (48.996444508, 13.659029212), (48.959683065, 10.404643475), align=None)
        with Locations(Location((51.796444508, 12, 0), (0, 0, 180))):
            Circle(SKETCH_24_R, mode=Mode.SUBTRACT)
    cut_extrude_11 = extrude(amount=CUT_EXTRUDE_11_DEPTH, mode=Mode.SUBTRACT)

    # 镜向1: 切除-拉伸11 across plane
    add(cut_extrude_11.mirror(Plane(origin=(0, 0, 0), x_dir=(1, 0, 0), z_dir=(0, 0, -1))), mode=Mode.SUBTRACT)

    # 镜向2: 切除-拉伸10 across plane
    add(cut_extrude_10.mirror(Plane(origin=(0, 0, 0), x_dir=(1, 0, 0), z_dir=(0, 0, -1))), mode=Mode.SUBTRACT)


solid = part.part
